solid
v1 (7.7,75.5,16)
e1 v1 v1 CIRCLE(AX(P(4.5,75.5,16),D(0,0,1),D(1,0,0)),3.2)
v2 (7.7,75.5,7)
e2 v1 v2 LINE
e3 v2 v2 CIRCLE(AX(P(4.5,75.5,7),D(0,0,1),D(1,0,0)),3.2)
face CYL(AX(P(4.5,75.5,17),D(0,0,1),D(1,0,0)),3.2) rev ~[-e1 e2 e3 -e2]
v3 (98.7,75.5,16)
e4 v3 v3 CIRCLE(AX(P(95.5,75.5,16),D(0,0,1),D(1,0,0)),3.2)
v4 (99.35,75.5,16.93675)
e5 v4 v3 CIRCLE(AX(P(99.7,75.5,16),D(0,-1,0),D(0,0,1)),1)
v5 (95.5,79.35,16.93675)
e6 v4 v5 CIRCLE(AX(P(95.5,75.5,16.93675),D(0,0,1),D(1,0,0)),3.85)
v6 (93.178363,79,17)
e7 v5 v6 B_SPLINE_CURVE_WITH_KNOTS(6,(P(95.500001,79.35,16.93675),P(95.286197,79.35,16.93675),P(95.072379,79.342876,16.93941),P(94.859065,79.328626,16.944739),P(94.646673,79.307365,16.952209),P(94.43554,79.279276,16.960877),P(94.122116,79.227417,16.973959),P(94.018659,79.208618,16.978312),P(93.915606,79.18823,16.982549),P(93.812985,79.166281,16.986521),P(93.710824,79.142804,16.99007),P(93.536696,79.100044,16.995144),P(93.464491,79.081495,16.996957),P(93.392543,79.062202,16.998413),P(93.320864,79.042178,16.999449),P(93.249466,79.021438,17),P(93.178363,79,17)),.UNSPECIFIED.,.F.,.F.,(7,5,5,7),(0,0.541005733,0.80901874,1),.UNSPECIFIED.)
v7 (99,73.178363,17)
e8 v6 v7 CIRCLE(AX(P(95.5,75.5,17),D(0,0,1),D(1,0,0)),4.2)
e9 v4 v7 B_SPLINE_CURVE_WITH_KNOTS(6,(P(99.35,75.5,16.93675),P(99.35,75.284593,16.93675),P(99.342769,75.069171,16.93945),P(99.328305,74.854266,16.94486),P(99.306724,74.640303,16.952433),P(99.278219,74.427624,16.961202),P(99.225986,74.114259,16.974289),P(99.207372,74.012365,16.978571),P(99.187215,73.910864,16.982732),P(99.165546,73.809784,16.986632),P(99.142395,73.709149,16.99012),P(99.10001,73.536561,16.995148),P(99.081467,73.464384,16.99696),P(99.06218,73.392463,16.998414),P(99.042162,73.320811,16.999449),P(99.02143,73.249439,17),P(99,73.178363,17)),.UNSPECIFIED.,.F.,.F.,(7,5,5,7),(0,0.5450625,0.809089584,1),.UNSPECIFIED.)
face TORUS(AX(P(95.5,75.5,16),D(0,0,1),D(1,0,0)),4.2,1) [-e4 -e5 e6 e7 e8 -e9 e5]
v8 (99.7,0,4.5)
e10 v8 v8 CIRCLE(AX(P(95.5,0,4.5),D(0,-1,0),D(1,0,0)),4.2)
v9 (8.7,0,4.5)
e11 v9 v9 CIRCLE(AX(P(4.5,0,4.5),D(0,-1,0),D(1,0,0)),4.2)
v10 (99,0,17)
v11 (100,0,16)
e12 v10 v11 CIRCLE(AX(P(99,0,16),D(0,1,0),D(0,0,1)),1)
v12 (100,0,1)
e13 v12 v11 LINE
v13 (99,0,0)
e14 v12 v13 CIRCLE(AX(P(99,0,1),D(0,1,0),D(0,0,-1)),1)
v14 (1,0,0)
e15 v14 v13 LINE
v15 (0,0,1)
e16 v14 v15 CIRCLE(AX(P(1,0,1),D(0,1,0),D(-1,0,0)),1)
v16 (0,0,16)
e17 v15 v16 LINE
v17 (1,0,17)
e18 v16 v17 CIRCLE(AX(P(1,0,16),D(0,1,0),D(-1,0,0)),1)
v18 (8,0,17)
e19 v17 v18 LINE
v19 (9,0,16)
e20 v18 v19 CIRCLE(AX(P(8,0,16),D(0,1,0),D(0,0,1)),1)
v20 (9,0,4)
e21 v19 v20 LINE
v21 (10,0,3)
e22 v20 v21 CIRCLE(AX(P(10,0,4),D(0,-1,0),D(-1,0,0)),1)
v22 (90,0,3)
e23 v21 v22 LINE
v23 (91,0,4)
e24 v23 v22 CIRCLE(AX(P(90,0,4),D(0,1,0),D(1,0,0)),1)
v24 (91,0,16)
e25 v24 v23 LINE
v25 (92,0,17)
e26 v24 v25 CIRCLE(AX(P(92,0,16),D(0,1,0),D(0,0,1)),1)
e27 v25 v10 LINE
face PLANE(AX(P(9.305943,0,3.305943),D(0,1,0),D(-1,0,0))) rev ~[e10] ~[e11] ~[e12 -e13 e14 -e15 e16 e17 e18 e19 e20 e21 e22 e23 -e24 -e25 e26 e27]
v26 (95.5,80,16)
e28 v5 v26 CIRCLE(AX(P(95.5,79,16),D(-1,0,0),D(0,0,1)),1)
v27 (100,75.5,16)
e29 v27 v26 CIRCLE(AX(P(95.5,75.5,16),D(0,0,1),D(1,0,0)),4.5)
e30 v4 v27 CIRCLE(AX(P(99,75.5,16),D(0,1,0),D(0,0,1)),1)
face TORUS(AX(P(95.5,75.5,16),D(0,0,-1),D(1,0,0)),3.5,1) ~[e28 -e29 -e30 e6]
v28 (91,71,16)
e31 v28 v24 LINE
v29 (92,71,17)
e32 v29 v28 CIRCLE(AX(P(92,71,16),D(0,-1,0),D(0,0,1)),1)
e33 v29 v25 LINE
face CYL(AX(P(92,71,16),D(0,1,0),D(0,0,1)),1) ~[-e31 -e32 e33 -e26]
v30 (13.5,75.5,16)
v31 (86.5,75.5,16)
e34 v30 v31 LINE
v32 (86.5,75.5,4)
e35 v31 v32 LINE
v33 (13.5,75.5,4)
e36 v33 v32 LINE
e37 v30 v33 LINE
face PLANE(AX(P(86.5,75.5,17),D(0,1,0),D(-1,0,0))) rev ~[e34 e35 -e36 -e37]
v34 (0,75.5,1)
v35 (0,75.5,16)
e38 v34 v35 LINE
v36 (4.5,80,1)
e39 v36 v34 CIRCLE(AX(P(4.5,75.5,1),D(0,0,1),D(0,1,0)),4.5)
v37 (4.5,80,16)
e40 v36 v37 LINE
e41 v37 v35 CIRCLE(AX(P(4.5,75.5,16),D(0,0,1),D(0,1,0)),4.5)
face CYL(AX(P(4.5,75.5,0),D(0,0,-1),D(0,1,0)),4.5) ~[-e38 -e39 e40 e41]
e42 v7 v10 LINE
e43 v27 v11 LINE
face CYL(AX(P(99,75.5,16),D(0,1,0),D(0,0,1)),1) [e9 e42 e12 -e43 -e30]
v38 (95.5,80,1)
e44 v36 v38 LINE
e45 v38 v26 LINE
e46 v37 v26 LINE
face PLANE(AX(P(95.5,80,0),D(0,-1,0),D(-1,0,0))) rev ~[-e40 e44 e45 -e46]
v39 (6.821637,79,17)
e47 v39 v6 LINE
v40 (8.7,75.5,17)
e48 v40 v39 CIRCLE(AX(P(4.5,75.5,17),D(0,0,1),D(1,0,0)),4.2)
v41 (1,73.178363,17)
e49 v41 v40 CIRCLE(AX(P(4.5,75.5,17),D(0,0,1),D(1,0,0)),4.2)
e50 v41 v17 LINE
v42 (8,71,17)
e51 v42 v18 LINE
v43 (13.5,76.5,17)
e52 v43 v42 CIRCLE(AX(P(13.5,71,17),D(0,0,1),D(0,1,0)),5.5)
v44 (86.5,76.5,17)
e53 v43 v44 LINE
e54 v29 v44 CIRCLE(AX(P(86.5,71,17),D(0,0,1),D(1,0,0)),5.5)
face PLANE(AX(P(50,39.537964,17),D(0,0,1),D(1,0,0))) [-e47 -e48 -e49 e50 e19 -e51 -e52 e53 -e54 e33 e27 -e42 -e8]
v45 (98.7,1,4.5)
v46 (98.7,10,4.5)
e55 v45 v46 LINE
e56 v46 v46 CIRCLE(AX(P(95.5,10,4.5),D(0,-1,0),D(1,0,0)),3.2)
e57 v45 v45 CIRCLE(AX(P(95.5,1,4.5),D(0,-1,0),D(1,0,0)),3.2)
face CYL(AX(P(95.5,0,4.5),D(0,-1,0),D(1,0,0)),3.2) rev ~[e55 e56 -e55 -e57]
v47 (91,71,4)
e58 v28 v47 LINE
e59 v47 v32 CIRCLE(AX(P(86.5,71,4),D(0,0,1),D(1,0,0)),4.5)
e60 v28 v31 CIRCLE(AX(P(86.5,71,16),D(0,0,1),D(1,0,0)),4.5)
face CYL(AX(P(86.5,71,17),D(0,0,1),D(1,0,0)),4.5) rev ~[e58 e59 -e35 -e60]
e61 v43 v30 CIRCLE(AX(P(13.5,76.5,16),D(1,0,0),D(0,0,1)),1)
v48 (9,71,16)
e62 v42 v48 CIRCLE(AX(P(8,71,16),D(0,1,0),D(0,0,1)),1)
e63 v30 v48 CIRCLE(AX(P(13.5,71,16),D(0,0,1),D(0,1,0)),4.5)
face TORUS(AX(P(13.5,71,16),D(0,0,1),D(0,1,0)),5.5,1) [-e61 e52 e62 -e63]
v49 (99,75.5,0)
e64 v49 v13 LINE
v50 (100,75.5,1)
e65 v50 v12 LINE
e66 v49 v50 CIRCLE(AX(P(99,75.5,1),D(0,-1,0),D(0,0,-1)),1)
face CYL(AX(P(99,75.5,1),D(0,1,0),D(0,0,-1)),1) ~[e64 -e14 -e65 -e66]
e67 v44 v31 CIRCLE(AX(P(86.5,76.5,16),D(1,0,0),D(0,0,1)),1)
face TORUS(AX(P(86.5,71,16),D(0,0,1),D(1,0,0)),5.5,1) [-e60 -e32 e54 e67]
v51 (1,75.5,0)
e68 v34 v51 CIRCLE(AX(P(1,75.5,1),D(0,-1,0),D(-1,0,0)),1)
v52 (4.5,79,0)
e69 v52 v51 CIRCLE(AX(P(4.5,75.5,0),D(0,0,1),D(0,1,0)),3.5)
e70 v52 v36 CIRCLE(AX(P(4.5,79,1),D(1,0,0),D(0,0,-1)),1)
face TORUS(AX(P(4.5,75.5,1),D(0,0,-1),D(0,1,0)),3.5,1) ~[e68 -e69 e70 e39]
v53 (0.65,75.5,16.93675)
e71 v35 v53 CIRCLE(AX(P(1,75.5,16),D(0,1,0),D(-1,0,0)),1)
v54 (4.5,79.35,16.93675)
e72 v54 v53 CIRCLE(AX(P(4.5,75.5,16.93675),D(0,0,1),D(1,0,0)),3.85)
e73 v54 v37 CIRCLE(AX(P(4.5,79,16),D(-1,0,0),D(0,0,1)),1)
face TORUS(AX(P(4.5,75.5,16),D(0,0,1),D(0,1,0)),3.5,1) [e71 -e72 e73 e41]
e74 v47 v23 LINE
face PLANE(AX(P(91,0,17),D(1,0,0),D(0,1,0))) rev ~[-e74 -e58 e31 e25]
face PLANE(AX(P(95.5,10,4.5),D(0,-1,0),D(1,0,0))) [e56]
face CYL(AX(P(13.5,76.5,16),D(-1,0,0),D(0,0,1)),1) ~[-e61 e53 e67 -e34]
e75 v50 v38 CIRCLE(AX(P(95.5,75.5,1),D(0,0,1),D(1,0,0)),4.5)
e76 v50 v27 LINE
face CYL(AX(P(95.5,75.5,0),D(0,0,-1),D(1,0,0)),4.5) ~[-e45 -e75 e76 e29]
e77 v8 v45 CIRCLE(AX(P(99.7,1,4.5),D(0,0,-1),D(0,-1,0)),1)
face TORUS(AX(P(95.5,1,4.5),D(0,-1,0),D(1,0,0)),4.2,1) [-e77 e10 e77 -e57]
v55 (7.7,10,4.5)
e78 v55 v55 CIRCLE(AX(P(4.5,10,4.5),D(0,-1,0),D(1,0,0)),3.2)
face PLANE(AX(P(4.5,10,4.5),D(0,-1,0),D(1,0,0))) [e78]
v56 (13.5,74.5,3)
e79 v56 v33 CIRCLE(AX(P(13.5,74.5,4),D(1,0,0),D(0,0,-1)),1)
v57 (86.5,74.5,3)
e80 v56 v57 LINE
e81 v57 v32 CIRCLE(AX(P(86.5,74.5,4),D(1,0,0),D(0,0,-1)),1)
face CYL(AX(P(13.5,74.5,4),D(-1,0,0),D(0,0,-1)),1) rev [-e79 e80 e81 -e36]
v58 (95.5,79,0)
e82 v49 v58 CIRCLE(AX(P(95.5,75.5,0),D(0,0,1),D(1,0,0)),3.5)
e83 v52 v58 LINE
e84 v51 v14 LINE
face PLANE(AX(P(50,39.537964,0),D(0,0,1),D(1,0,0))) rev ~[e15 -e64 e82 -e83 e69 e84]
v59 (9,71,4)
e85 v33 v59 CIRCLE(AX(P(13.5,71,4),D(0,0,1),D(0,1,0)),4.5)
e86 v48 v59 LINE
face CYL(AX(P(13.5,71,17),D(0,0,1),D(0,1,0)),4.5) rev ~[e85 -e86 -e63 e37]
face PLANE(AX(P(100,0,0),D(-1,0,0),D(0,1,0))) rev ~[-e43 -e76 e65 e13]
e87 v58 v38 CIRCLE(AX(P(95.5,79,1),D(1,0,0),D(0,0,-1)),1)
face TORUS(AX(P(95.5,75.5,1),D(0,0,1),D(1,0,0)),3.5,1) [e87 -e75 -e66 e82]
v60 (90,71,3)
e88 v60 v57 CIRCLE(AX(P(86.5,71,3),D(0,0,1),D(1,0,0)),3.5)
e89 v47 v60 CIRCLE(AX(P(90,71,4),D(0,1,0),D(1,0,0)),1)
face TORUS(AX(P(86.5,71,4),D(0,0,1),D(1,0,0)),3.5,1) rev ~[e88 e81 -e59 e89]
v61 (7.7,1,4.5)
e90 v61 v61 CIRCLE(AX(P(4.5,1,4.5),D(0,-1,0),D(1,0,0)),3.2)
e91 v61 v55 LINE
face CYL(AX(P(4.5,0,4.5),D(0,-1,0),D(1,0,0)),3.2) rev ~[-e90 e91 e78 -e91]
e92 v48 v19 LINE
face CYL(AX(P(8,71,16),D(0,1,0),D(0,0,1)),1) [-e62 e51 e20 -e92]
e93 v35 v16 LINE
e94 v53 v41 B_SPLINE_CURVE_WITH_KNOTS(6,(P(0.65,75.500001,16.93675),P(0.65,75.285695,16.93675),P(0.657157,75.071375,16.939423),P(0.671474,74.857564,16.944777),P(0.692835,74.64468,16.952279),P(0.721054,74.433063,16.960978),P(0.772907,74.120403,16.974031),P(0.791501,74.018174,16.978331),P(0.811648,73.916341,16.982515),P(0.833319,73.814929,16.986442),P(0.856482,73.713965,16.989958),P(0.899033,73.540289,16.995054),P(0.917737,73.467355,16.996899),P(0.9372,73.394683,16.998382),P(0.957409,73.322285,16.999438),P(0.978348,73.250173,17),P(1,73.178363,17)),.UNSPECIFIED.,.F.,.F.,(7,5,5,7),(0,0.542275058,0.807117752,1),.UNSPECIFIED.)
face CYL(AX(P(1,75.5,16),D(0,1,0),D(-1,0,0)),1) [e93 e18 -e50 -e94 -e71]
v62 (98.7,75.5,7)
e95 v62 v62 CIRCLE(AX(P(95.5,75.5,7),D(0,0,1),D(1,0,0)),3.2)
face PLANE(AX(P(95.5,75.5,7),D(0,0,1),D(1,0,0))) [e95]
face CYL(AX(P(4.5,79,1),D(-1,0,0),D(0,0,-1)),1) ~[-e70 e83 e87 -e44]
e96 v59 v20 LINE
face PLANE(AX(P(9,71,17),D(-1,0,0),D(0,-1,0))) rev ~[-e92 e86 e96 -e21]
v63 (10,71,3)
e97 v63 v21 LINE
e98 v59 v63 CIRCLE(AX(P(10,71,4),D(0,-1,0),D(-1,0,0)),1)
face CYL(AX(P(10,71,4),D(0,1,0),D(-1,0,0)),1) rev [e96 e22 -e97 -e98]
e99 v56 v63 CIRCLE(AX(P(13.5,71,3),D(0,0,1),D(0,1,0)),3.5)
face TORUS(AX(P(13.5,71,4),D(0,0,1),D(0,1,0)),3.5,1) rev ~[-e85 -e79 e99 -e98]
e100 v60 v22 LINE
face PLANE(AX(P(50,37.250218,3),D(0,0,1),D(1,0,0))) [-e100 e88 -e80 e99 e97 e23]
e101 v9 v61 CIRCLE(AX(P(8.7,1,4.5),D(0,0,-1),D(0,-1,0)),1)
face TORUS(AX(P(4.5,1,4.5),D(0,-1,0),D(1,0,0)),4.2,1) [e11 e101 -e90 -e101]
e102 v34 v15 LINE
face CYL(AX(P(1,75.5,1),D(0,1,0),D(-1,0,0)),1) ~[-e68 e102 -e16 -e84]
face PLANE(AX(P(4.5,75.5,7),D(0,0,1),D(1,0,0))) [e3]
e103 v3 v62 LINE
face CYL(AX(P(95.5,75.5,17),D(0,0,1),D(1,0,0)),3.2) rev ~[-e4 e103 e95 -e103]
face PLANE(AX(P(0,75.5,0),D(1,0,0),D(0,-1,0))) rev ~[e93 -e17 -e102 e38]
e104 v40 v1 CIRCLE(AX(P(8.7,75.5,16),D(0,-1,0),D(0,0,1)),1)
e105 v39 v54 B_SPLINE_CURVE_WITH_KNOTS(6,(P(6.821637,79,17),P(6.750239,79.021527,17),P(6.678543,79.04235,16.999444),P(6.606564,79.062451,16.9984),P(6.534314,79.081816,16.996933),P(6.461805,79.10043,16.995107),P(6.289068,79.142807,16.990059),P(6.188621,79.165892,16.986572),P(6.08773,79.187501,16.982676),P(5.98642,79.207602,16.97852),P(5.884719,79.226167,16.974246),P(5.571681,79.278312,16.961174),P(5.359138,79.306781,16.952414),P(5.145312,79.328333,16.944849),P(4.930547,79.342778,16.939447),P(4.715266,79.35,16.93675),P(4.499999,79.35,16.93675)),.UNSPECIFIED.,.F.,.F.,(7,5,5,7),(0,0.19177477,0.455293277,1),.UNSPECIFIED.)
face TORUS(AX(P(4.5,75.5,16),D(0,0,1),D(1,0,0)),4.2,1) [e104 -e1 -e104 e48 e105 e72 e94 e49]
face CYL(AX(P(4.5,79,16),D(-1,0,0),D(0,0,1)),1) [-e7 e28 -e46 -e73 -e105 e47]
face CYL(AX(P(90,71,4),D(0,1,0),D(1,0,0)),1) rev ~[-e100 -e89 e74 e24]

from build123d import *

# Parameters (mm, degrees)
F1_DEPTH     = 17
F5_DEPTH     = 14
F3_R         = 3.2
F6_DEPTH     = 10
F4_R         = 3.2
F7_DEPTH     = 10
F8_T1_DEPTH  = 73
F8_T3_DEPTH  = 71
F8_T6_ANGLE  = 90
F8_T8_ANGLE  = 90
F8_T9_DEPTH  = 78
F8_T11_DEPTH = 73.5
F8_T13_DEPTH = 73
F8_T15_DEPTH = 91
F8_T26_ANGLE = 90
F8_T28_ANGLE = 90
F8_T30_ANGLE = 90
F8_T32_ANGLE = 90
F8_T34_ANGLE = 90
F8_T36_ANGLE = 90


# Not quite as in the source:
# - a fillet or chamfer that OpenCascade refuses, or shapes differently, is made with other operations: its cross-section is extruded or revolved along the edge and cut away or added


with BuildPart() as f1:
    # F0 (on Top) → F1 (new body)
    with BuildSketch(Plane.XY):
        with BuildLine():
            Line((0, 75.5), (0, 0))
            Line((0, 0), (50, 0))
            Line((50, 0), (100, 0))
            Line((100, 0), (100, 75.5))
            ThreePointArc((100, 75.5), (98.6819805153, 78.6819805153), (95.5, 80))
            Line((95.5, 80), (50, 80))
            Line((50, 80), (4.5, 80))
            ThreePointArc((4.5, 80), (1.3180194847, 78.6819805153), (0, 75.5))
        make_face()
    extrude(amount=F1_DEPTH)

    # F3 (on offset) → F5 (cut)
    with BuildSketch(Plane.XY.offset(17)):
        with BuildLine():
            Line((9, 71), (9, 0))
            Line((9, 0), (50, 0))
            Line((50, 0), (91, 0))
            Line((91, 0), (91, 71))
            ThreePointArc((91, 71), (89.6819805153, 74.1819805153), (86.5, 75.5))
            Line((86.5, 75.5), (50, 75.5))
            Line((50, 75.5), (13.5, 75.5))
            ThreePointArc((13.5, 75.5), (10.3180194847, 74.1819805153), (9, 71))
        make_face()
    extrude(amount=-F5_DEPTH, mode=Mode.SUBTRACT)

    # F3 (on offset) → F6 (cut)
    with BuildSketch(Plane.XY.offset(17)):
        with Locations((4.5, 75.5)):
            Circle(F3_R)
        with Locations((95.5, 75.5)):
            Circle(F3_R)
    extrude(amount=-F6_DEPTH, mode=Mode.SUBTRACT)

    # F4 (on Front) → F7 (cut)
    with BuildSketch(Plane.XZ):
        with Locations((4.5, 4.5)):
            Circle(F4_R)
        with Locations((95.5, 4.5)):
            Circle(F4_R)
    extrude(amount=-F7_DEPTH, mode=Mode.SUBTRACT)

    # F8: fillet of radius 1 on 8 edges, made by hand

    # F8_s2 → F8_t1 (join)
    with BuildSketch(Plane.YZ.offset(13.5)):
        with BuildLine():
            ThreePointArc((74.5, 3), (75.2071067812, 3.2928932188), (75.5, 4))
            Line((75.5, 4), (75.5, 3))
            Line((75.5, 3), (74.5, 3))
        make_face()
    extrude(amount=F8_T1_DEPTH)

    # F8_s4 → F8_t3 (join)
    with BuildSketch(Plane.XZ.offset(-71)):
        with BuildLine():
            ThreePointArc((9, 4), (9.2928932188, 3.2928932188), (10, 3))
            Line((10, 3), (9, 3))
            Line((9, 3), (9, 4))
        make_face()
        with BuildLine():
            ThreePointArc((91, 4), (90.7071067812, 3.2928932188), (90, 3))
            Line((90, 3), (91, 3))
            Line((91, 3), (91, 4))
        make_face()
    extrude(amount=F8_T3_DEPTH)

    # F8_s5 → F8_t6 (revolve)
    with BuildSketch(Plane.XZ.offset(-71)):
        with BuildLine():
            ThreePointArc((90, 3), (90.7071067812, 3.2928932188), (91, 4))
            Line((91, 4), (91, 3))
            Line((91, 3), (90, 3))
        make_face()
    revolve(axis=Axis((86.5, 71, 3), (0, 0, 1)), revolution_arc=F8_T6_ANGLE)

    # F8_s7 → F8_t8 (revolve)
    with BuildSketch(Plane.YZ.offset(13.5)):
        with BuildLine():
            ThreePointArc((74.5, 3), (75.2071067812, 3.2928932188), (75.5, 4))
            Line((75.5, 4), (75.5, 3))
            Line((75.5, 3), (74.5, 3))
        make_face()
    revolve(axis=Axis((13.5, 71, 3), (0, 0, 1)), revolution_arc=F8_T8_ANGLE)

    # F8_s10 → F8_t9 (cut)
    with BuildSketch(Plane.XZ.offset(-75.5)):
        with BuildLine():
            ThreePointArc((99, 17), (99.7071067812, 16.7071067812), (100, 16))
            Line((100, 16), (100, 17))
            Line((100, 17), (99, 17))
        make_face()
        with BuildLine():
            ThreePointArc((99, 0), (99.7071067812, 0.2928932188), (100, 1))
            Line((100, 1), (100, 0))
            Line((100, 0), (99, 0))
        make_face()
        with BuildLine():
            ThreePointArc((0, 1), (0.2928932188, 0.2928932188), (1, 0))
            Line((1, 0), (0, 0))
            Line((0, 0), (0, 1))
        make_face()
        with BuildLine():
            ThreePointArc((0, 16), (0.2928932188, 16.7071067812), (1, 17))
            Line((1, 17), (0, 17))
            Line((0, 17), (0, 16))
        make_face()
    extrude(amount=F8_T9_DEPTH, mode=Mode.SUBTRACT)

    # F8_s12 → F8_t11 (cut)
    with BuildSketch(Plane.XZ.offset(-71)):
        with BuildLine():
            ThreePointArc((8, 17), (8.7071067812, 16.7071067812), (9, 16))
            Line((9, 16), (9, 17))
            Line((9, 17), (8, 17))
        make_face()
        with BuildLine():
            ThreePointArc((92, 17), (91.2928932188, 16.7071067812), (91, 16))
            Line((91, 16), (91, 17))
            Line((91, 17), (92, 17))
        make_face()
    extrude(amount=F8_T11_DEPTH, mode=Mode.SUBTRACT)

    # F8_s14 → F8_t13 (cut)
    with BuildSketch(Plane.YZ.offset(13.5)):
        with BuildLine():
            ThreePointArc((76.5, 17), (75.7928932188, 16.7071067812), (75.5, 16))
            Line((75.5, 16), (75.5, 17))
            Line((75.5, 17), (76.5, 17))
        make_face()
    extrude(amount=F8_T13_DEPTH, mode=Mode.SUBTRACT)

    # F8_s16 → F8_t15 (cut)
    with BuildSketch(Plane.YZ.offset(4.5)):
        with BuildLine():
            ThreePointArc((79, 0), (79.7071067812, 0.2928932188), (80, 1))
            Line((80, 1), (80, 0))
            Line((80, 0), (79, 0))
        make_face()
        with BuildLine():
            ThreePointArc((79, 17), (79.7071067812, 16.7071067812), (80, 16))
            Line((80, 16), (80, 17))
            Line((80, 17), (79, 17))
        make_face()
    extrude(amount=F8_T15_DEPTH, mode=Mode.SUBTRACT)

    # F8_s17 → F8_t18 (revolve, cut)
    with BuildSketch(Plane.XY.offset(4.5)):
        with BuildLine():
            ThreePointArc((8.7, 0), (7.9928932188, 0.2928932188), (7.7, 1))
            Line((7.7, 1), (7.7, 0))
            Line((7.7, 0), (8.7, 0))
        make_face()
    revolve(axis=Axis((4.5, 0, 4.5), (0, -1, 0)), mode=Mode.SUBTRACT)

    # F8_s19 → F8_t20 (revolve, cut)
    with BuildSketch(Plane.XY.offset(4.5)):
        with BuildLine():
            ThreePointArc((99.7, 0), (98.9928932188, 0.2928932188), (98.7, 1))
            Line((98.7, 1), (98.7, 0))
            Line((98.7, 0), (99.7, 0))
        make_face()
    revolve(axis=Axis((95.5, 0, 4.5), (0, -1, 0)), mode=Mode.SUBTRACT)

    # F8_s21 → F8_t22 (revolve, cut)
    with BuildSketch(Plane.XZ.offset(-75.5)):
        with BuildLine():
            ThreePointArc((99.7, 17), (98.9928932188, 16.7071067812), (98.7, 16))
            Line((98.7, 16), (98.7, 17))
            Line((98.7, 17), (99.7, 17))
        make_face()
    revolve(axis=Axis((95.5, 75.5, 17), (0, 0, 1)), mode=Mode.SUBTRACT)

    # F8_s23 → F8_t24 (revolve, cut)
    with BuildSketch(Plane.XZ.offset(-75.5)):
        with BuildLine():
            ThreePointArc((8.7, 17), (7.9928932188, 16.7071067812), (7.7, 16))
            Line((7.7, 16), (7.7, 17))
            Line((7.7, 17), (8.7, 17))
        make_face()
    revolve(axis=Axis((4.5, 75.5, 17), (0, 0, 1)), mode=Mode.SUBTRACT)

    # F8_s25 → F8_t26 (revolve, cut)
    with BuildSketch(Plane.YZ.offset(13.5)):
        with BuildLine():
            ThreePointArc((76.5, 17), (75.7928932188, 16.7071067812), (75.5, 16))
            Line((75.5, 16), (75.5, 17))
            Line((75.5, 17), (76.5, 17))
        make_face()
    revolve(axis=Axis((13.5, 71, 17), (0, 0, 1)), revolution_arc=F8_T26_ANGLE, mode=Mode.SUBTRACT)

    # F8_s27 → F8_t28 (revolve, cut)
    with BuildSketch(Plane.XZ.offset(-71)):
        with BuildLine():
            ThreePointArc((92, 17), (91.2928932188, 16.7071067812), (91, 16))
            Line((91, 16), (91, 17))
            Line((91, 17), (92, 17))
        make_face()
    revolve(axis=Axis((86.5, 71, 17), (0, 0, 1)), revolution_arc=F8_T28_ANGLE, mode=Mode.SUBTRACT)

    # F8_s29 → F8_t30 (revolve, cut)
    with BuildSketch(Plane.XZ.offset(-75.5)):
        with BuildLine():
            ThreePointArc((99, 0), (99.7071067812, 0.2928932188), (100, 1))
            Line((100, 1), (100, 0))
            Line((100, 0), (99, 0))
        make_face()
    revolve(axis=Axis((95.5, 75.5, 0), (0, 0, 1)), revolution_arc=F8_T30_ANGLE, mode=Mode.SUBTRACT)

    # F8_s31 → F8_t32 (revolve, cut)
    with BuildSketch(Plane.YZ.offset(4.5)):
        with BuildLine():
            ThreePointArc((80, 1), (79.7071067812, 0.2928932188), (79, 0))
            Line((79, 0), (80, 0))
            Line((80, 0), (80, 1))
        make_face()
    revolve(axis=Axis((4.5, 75.5, 0), (0, 0, 1)), revolution_arc=F8_T32_ANGLE, mode=Mode.SUBTRACT)

    # F8_s33 → F8_t34 (revolve, cut)
    with BuildSketch(Plane.XZ.offset(-75.5)):
        with BuildLine():
            ThreePointArc((99, 17), (99.7071067812, 16.7071067812), (100, 16))
            Line((100, 16), (100, 17))
            Line((100, 17), (99, 17))
        make_face()
    revolve(axis=Axis((95.5, 75.5, 17), (0, 0, 1)), revolution_arc=F8_T34_ANGLE, mode=Mode.SUBTRACT)

    # F8_s35 → F8_t36 (revolve, cut)
    with BuildSketch(Plane.YZ.offset(4.5)):
        with BuildLine():
            ThreePointArc((80, 16), (79.7071067812, 16.7071067812), (79, 17))
            Line((79, 17), (80, 17))
            Line((80, 17), (80, 16))
        make_face()
    revolve(axis=Axis((4.5, 75.5, 17), (0, 0, 1)), revolution_arc=F8_T36_ANGLE, mode=Mode.SUBTRACT)


solid = f1.part
